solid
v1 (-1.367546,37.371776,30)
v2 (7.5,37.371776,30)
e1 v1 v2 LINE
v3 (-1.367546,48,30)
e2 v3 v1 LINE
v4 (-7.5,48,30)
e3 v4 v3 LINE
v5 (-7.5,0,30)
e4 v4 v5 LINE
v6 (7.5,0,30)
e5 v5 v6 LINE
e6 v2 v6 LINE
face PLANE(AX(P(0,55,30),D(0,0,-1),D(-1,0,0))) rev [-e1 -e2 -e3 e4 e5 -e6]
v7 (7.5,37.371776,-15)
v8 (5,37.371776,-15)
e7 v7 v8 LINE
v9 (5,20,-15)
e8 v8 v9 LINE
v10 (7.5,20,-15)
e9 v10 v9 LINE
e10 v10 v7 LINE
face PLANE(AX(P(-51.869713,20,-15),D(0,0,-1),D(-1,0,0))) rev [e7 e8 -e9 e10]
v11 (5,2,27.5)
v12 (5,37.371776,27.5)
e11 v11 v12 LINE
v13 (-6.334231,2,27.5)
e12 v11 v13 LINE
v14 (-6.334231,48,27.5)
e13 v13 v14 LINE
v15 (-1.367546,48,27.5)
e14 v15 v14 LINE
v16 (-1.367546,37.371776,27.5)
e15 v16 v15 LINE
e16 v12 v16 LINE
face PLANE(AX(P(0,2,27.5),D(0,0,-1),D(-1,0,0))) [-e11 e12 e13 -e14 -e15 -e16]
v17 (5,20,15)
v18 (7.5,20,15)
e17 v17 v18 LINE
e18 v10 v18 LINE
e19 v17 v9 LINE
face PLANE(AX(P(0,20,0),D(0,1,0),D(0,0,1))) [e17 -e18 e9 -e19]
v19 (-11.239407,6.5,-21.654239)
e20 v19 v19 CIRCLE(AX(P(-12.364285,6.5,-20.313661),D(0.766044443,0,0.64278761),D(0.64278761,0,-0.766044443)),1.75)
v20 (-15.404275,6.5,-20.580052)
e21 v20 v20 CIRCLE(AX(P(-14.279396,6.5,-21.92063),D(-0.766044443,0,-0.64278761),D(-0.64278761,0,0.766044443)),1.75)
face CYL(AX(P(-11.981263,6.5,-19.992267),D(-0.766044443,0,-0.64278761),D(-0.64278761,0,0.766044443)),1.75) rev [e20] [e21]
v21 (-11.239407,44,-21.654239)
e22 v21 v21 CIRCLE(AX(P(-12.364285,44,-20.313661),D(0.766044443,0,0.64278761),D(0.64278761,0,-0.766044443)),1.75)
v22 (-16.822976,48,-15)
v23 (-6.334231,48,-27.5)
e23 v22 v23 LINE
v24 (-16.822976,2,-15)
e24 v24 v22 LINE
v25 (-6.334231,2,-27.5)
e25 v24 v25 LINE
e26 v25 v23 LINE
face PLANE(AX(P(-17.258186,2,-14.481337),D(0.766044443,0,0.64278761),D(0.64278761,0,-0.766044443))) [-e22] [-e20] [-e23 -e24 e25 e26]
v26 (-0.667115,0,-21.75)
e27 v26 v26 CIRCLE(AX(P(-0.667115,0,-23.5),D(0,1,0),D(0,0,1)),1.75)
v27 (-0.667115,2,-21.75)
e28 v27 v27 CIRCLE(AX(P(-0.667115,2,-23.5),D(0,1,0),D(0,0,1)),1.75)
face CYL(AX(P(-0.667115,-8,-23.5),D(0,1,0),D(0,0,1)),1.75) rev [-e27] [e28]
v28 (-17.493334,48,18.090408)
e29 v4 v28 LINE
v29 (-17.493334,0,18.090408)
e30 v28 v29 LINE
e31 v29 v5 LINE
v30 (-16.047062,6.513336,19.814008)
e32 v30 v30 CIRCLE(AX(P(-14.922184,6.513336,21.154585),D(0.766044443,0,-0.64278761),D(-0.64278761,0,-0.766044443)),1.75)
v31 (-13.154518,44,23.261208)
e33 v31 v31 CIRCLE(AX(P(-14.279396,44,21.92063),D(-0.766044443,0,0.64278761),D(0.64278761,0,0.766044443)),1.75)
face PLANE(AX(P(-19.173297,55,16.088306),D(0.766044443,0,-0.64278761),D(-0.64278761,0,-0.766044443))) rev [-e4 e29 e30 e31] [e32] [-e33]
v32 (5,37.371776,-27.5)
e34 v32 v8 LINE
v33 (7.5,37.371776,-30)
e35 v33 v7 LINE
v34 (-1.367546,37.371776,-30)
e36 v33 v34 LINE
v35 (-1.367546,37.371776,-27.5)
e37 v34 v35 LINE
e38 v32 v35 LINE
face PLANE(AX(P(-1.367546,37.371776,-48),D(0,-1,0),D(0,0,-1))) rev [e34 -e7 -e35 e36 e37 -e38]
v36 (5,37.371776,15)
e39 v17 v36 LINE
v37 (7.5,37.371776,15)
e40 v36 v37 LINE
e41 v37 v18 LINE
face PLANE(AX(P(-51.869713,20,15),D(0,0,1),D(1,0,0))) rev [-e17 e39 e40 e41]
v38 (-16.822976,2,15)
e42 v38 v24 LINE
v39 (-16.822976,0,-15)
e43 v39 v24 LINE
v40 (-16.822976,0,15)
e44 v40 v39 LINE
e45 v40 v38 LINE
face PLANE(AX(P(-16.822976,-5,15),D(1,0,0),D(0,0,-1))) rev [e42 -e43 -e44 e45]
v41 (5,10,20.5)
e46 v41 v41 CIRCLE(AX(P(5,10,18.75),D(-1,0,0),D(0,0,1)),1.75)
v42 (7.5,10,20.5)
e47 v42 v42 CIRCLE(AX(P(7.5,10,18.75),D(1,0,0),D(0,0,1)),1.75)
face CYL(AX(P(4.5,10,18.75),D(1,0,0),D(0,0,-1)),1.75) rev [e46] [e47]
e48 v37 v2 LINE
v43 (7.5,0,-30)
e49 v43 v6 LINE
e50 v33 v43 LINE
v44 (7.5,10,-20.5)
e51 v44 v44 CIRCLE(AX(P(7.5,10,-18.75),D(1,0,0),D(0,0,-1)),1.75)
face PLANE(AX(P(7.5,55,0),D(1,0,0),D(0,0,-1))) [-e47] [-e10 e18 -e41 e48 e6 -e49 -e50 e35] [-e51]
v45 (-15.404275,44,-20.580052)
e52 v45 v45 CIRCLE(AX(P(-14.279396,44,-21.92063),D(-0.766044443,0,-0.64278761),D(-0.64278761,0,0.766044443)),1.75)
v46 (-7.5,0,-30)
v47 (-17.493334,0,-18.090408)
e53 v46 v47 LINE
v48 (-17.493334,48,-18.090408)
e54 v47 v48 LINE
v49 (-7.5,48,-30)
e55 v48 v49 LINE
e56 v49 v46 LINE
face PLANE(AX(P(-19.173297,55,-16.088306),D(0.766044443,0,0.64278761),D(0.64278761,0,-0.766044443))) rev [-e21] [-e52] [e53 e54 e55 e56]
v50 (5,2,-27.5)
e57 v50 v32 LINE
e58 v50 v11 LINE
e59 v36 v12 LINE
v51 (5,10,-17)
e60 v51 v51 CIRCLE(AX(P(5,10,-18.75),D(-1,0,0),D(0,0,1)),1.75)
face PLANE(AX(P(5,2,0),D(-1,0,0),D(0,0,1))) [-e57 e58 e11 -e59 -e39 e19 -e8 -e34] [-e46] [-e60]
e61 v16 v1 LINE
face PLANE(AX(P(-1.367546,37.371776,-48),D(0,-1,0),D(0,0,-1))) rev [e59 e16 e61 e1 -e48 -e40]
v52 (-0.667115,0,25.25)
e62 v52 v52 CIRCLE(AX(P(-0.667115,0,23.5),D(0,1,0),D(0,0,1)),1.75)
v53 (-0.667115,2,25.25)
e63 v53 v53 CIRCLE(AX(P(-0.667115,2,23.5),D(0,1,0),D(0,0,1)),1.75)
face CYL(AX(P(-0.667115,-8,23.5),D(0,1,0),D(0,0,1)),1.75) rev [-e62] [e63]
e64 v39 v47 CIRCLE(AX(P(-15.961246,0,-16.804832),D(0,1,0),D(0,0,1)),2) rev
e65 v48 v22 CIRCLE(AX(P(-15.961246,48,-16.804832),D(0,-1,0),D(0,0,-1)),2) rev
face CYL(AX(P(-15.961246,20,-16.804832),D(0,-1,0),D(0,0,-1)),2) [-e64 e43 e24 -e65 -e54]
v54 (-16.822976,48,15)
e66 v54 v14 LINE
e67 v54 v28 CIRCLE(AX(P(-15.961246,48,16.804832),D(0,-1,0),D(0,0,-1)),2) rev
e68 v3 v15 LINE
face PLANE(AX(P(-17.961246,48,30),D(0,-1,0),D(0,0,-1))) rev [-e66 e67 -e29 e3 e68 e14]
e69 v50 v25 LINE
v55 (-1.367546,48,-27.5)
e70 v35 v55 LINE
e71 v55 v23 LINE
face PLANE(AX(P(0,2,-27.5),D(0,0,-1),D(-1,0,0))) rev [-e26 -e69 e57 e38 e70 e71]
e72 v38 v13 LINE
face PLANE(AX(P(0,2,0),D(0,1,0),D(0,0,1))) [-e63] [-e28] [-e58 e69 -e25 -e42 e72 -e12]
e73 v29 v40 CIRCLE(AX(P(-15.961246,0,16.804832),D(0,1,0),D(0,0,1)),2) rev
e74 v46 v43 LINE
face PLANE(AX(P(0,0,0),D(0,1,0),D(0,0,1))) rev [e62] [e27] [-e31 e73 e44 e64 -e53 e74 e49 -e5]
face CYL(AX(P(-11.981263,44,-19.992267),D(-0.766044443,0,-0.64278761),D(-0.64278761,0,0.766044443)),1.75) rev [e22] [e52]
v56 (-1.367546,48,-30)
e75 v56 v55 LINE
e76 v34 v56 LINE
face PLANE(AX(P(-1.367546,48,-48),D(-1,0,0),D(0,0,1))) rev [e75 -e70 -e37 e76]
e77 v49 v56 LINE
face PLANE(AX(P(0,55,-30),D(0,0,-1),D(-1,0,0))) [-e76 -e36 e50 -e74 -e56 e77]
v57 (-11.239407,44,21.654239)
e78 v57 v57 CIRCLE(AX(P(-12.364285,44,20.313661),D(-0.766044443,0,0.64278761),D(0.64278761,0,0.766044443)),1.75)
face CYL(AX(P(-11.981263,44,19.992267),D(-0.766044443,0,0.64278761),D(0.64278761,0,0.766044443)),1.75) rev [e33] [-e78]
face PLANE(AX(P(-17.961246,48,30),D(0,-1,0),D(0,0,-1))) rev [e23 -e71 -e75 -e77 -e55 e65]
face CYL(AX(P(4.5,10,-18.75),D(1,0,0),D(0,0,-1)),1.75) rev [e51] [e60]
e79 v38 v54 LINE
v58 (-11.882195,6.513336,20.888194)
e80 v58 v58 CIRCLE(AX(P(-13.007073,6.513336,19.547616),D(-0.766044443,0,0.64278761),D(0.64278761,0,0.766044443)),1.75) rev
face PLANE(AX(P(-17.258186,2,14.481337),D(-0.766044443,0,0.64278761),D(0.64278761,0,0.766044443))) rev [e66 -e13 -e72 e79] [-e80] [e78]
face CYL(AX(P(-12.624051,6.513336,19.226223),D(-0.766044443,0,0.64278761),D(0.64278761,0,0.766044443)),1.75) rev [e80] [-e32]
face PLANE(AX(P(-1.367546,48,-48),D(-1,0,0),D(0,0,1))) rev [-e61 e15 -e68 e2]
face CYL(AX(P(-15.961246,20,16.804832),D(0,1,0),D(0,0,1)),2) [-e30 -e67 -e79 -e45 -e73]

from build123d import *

# Parameters (mm, degrees)
SKETCH_1_W          = 15
SKETCH_1_H          = 60
EXTRUDE_1_DEPTH     = 55
CUT_EXTRUDE_1_DEPTH = 53
SKETCH_3_W          = 78.566437997
SKETCH_3_H          = 30
CUT_EXTRUDE_2_DEPTH = 35
CUT_EXTRUDE_3_DEPTH = 25
FILLET_1_R          = 2
SKETCH_5_R          = 1.75
CUT_EXTRUDE_4_DEPTH = 3
SKETCH_6_R          = 1.75
CUT_EXTRUDE_5_DEPTH = 3
SKETCH_7_R          = 1.75
CUT_EXTRUDE_6_DEPTH = 3
SKETCH_8_W          = 60
SKETCH_8_H          = 7
CUT_EXTRUDE_7_DEPTH = 68.625993731
SKETCH_9_R          = 1.75
CUT_EXTRUDE_8_DEPTH = 10
SKETCH_10_W         = 8.867546431
SKETCH_10_H         = 10.62822389
CUT_EXTRUDE_9_DEPTH = 78


with BuildPart() as part:
    # 草图1 → 凸台-拉伸1 (new body)
    with BuildSketch(Plane(origin=(0, 0, 0), x_dir=(1, 0, 0), z_dir=(0, 1, 0))):
        Polygon((-7.5, 30), (-32.672988935, 0), (-7.5, -30), align=None)
        Rectangle(SKETCH_1_W, SKETCH_1_H)
    extrude(amount=EXTRUDE_1_DEPTH)

    # 草图2 → 切除-拉伸1 (cut)
    with BuildSketch(Plane(origin=(0, 55, 0), x_dir=(1, 0, 0), z_dir=(0, 1, 0))):
        Polygon((-6.334230855, 27.5), (-29.409470712, 0), (-6.334230855, -27.5), (5, -27.5), (5, 27.5), align=None)
    extrude(amount=-CUT_EXTRUDE_1_DEPTH, mode=Mode.SUBTRACT)

    # 草图3 → 切除-拉伸2 (cut)
    with BuildSketch(Plane(origin=(0, 55, 0), x_dir=(1, 0, 0), z_dir=(0, 1, 0))):
        with Locations((-12.586494467, 0)):
            Rectangle(SKETCH_3_W, SKETCH_3_H)
    extrude(amount=-CUT_EXTRUDE_2_DEPTH, mode=Mode.SUBTRACT)

    # 草图4 → 切除-拉伸3 (cut)
    with BuildSketch(Plane(origin=(0, 20, 0), x_dir=(1, 0, 0), z_dir=(0, 1, 0))):
        Polygon((-16.822976244, 15), (-73.584466249, 15), (-53.824577323, -15), (-16.822976244, -15), align=None)
    extrude(amount=-CUT_EXTRUDE_3_DEPTH, mode=Mode.SUBTRACT)

    # 圆角1
    # the kernel refuses this fillet: 2 mm, written as the material it takes off along each edge
    with BuildSketch(Plane(origin=(-20.086494468, 65.085601878, 15), x_dir=(1, 0, 0), z_dir=(0, -1, 0))) as fillet_1_piece_1:
        with BuildLine():
            CenterArc((4.125248856, 1.80483249), FILLET_1_R, 140, 104.477512186)
            Line((2.593159969, 3.09040771), (2.562518192, 3.116119214))
            Line((2.562518192, 3.116119214), (-0.030641778, 0.025711504))
            Line((-0.030641778, 0.025711504), (0, -0.04))
            ThreePointArc((0, -0.04), (1.631759112, -0.04), (3.246283611, -0.03609665))
            Line((3.246283611, -0.03609665), (3.263518223, 0))
        make_face()
    extrude(amount=75.171203755, mode=Mode.SUBTRACT)
    with BuildSketch(Plane(origin=(-20.086494468, -10.085601878, -15), x_dir=(0.6427876096865405, 0, -0.7660444431189769), z_dir=(0, 1, 0))) as fillet_1_piece_2:
        with BuildLine():
            CenterArc((4.034240751, -2), FILLET_1_R, 90, 104.477512186)
            Line((2.097749078, -2.5), (2.059019244, -2.51))
            ThreePointArc((2.059019244, -2.51), (1.018232761, -1.275711504), (-0.030641778, -0.025711504))
            Line((-0.030641778, -0.025711504), (0, 0.04))
            Line((0, 0.04), (4.034240751, 0.04))
            Line((4.034240751, 0.04), (4.034240751, 0))
        make_face()
    extrude(amount=75.171203755, mode=Mode.SUBTRACT)

    # 草图5 → 切除-拉伸4 (cut)
    with BuildSketch(Plane(origin=(-19.173296961, 0, 16.088306409), x_dir=(0.6427876096865413, 0, 0.7660444431189765), z_dir=(-0.7660444431189765, 0, 0.6427876096865413))):
        with Locations((7.613557632, 44)):
            Circle(SKETCH_5_R)
        with Locations((6.613557632, 6.513335705)):
            Circle(SKETCH_5_R)
    extrude(amount=-CUT_EXTRUDE_4_DEPTH, mode=Mode.SUBTRACT)

    # 草图6 → 切除-拉伸5 (cut)
    with BuildSketch(Plane(origin=(-19.173296961, 0, -16.088306409), x_dir=(-0.642787609686541, 0, 0.7660444431189768), z_dir=(-0.7660444431189768, 0, -0.642787609686541))):
        with Locations((-7.613557632, 44)):
            Circle(SKETCH_6_R)
        with Locations((-7.613557632, 6.5)):
            Circle(SKETCH_6_R)
    extrude(amount=-CUT_EXTRUDE_5_DEPTH, mode=Mode.SUBTRACT)

    # 草图7 → 切除-拉伸6 (cut)
    with BuildSketch(Plane(origin=(7.5, 0, 0), x_dir=(0, 0, -1), z_dir=(1, 0, 0))):
        with Locations((18.75, 10)):
            Circle(SKETCH_7_R)
        with Locations(Location((-18.75, 10, 0), (0, 0, 180))):
            Circle(SKETCH_7_R)
    extrude(amount=-CUT_EXTRUDE_6_DEPTH, mode=Mode.SUBTRACT)

    # 草图8 → 切除-拉伸7 (cut, through all)
    with BuildSketch(Plane(origin=(7.5, 0, 0), x_dir=(0, 0, -1), z_dir=(1, 0, 0))):
        with Locations((0, 51.5)):
            Rectangle(SKETCH_8_W, SKETCH_8_H)
    extrude(amount=-CUT_EXTRUDE_7_DEPTH, mode=Mode.SUBTRACT)

    # 草图9 → 切除-拉伸8 (cut)
    with BuildSketch(Plane(origin=(0, 2, 0), x_dir=(1, 0, 0), z_dir=(0, 1, 0))):
        with Locations(Location((-0.667115427, -23.5, 0), (0, 0, 270))):
            Circle(SKETCH_9_R)
        with Locations(Location((-0.667115427, 23.5, 0), (0, 0, 270))):
            Circle(SKETCH_9_R)
    extrude(amount=-CUT_EXTRUDE_8_DEPTH, mode=Mode.SUBTRACT)

    # 草图10 → 切除-拉伸9 (cut)
    with BuildSketch(Plane.XY.offset(30)):
        with Locations((3.066226785, 42.685888055)):
            Rectangle(SKETCH_10_W, SKETCH_10_H)
    extrude(amount=-CUT_EXTRUDE_9_DEPTH, mode=Mode.SUBTRACT)


solid = part.part
